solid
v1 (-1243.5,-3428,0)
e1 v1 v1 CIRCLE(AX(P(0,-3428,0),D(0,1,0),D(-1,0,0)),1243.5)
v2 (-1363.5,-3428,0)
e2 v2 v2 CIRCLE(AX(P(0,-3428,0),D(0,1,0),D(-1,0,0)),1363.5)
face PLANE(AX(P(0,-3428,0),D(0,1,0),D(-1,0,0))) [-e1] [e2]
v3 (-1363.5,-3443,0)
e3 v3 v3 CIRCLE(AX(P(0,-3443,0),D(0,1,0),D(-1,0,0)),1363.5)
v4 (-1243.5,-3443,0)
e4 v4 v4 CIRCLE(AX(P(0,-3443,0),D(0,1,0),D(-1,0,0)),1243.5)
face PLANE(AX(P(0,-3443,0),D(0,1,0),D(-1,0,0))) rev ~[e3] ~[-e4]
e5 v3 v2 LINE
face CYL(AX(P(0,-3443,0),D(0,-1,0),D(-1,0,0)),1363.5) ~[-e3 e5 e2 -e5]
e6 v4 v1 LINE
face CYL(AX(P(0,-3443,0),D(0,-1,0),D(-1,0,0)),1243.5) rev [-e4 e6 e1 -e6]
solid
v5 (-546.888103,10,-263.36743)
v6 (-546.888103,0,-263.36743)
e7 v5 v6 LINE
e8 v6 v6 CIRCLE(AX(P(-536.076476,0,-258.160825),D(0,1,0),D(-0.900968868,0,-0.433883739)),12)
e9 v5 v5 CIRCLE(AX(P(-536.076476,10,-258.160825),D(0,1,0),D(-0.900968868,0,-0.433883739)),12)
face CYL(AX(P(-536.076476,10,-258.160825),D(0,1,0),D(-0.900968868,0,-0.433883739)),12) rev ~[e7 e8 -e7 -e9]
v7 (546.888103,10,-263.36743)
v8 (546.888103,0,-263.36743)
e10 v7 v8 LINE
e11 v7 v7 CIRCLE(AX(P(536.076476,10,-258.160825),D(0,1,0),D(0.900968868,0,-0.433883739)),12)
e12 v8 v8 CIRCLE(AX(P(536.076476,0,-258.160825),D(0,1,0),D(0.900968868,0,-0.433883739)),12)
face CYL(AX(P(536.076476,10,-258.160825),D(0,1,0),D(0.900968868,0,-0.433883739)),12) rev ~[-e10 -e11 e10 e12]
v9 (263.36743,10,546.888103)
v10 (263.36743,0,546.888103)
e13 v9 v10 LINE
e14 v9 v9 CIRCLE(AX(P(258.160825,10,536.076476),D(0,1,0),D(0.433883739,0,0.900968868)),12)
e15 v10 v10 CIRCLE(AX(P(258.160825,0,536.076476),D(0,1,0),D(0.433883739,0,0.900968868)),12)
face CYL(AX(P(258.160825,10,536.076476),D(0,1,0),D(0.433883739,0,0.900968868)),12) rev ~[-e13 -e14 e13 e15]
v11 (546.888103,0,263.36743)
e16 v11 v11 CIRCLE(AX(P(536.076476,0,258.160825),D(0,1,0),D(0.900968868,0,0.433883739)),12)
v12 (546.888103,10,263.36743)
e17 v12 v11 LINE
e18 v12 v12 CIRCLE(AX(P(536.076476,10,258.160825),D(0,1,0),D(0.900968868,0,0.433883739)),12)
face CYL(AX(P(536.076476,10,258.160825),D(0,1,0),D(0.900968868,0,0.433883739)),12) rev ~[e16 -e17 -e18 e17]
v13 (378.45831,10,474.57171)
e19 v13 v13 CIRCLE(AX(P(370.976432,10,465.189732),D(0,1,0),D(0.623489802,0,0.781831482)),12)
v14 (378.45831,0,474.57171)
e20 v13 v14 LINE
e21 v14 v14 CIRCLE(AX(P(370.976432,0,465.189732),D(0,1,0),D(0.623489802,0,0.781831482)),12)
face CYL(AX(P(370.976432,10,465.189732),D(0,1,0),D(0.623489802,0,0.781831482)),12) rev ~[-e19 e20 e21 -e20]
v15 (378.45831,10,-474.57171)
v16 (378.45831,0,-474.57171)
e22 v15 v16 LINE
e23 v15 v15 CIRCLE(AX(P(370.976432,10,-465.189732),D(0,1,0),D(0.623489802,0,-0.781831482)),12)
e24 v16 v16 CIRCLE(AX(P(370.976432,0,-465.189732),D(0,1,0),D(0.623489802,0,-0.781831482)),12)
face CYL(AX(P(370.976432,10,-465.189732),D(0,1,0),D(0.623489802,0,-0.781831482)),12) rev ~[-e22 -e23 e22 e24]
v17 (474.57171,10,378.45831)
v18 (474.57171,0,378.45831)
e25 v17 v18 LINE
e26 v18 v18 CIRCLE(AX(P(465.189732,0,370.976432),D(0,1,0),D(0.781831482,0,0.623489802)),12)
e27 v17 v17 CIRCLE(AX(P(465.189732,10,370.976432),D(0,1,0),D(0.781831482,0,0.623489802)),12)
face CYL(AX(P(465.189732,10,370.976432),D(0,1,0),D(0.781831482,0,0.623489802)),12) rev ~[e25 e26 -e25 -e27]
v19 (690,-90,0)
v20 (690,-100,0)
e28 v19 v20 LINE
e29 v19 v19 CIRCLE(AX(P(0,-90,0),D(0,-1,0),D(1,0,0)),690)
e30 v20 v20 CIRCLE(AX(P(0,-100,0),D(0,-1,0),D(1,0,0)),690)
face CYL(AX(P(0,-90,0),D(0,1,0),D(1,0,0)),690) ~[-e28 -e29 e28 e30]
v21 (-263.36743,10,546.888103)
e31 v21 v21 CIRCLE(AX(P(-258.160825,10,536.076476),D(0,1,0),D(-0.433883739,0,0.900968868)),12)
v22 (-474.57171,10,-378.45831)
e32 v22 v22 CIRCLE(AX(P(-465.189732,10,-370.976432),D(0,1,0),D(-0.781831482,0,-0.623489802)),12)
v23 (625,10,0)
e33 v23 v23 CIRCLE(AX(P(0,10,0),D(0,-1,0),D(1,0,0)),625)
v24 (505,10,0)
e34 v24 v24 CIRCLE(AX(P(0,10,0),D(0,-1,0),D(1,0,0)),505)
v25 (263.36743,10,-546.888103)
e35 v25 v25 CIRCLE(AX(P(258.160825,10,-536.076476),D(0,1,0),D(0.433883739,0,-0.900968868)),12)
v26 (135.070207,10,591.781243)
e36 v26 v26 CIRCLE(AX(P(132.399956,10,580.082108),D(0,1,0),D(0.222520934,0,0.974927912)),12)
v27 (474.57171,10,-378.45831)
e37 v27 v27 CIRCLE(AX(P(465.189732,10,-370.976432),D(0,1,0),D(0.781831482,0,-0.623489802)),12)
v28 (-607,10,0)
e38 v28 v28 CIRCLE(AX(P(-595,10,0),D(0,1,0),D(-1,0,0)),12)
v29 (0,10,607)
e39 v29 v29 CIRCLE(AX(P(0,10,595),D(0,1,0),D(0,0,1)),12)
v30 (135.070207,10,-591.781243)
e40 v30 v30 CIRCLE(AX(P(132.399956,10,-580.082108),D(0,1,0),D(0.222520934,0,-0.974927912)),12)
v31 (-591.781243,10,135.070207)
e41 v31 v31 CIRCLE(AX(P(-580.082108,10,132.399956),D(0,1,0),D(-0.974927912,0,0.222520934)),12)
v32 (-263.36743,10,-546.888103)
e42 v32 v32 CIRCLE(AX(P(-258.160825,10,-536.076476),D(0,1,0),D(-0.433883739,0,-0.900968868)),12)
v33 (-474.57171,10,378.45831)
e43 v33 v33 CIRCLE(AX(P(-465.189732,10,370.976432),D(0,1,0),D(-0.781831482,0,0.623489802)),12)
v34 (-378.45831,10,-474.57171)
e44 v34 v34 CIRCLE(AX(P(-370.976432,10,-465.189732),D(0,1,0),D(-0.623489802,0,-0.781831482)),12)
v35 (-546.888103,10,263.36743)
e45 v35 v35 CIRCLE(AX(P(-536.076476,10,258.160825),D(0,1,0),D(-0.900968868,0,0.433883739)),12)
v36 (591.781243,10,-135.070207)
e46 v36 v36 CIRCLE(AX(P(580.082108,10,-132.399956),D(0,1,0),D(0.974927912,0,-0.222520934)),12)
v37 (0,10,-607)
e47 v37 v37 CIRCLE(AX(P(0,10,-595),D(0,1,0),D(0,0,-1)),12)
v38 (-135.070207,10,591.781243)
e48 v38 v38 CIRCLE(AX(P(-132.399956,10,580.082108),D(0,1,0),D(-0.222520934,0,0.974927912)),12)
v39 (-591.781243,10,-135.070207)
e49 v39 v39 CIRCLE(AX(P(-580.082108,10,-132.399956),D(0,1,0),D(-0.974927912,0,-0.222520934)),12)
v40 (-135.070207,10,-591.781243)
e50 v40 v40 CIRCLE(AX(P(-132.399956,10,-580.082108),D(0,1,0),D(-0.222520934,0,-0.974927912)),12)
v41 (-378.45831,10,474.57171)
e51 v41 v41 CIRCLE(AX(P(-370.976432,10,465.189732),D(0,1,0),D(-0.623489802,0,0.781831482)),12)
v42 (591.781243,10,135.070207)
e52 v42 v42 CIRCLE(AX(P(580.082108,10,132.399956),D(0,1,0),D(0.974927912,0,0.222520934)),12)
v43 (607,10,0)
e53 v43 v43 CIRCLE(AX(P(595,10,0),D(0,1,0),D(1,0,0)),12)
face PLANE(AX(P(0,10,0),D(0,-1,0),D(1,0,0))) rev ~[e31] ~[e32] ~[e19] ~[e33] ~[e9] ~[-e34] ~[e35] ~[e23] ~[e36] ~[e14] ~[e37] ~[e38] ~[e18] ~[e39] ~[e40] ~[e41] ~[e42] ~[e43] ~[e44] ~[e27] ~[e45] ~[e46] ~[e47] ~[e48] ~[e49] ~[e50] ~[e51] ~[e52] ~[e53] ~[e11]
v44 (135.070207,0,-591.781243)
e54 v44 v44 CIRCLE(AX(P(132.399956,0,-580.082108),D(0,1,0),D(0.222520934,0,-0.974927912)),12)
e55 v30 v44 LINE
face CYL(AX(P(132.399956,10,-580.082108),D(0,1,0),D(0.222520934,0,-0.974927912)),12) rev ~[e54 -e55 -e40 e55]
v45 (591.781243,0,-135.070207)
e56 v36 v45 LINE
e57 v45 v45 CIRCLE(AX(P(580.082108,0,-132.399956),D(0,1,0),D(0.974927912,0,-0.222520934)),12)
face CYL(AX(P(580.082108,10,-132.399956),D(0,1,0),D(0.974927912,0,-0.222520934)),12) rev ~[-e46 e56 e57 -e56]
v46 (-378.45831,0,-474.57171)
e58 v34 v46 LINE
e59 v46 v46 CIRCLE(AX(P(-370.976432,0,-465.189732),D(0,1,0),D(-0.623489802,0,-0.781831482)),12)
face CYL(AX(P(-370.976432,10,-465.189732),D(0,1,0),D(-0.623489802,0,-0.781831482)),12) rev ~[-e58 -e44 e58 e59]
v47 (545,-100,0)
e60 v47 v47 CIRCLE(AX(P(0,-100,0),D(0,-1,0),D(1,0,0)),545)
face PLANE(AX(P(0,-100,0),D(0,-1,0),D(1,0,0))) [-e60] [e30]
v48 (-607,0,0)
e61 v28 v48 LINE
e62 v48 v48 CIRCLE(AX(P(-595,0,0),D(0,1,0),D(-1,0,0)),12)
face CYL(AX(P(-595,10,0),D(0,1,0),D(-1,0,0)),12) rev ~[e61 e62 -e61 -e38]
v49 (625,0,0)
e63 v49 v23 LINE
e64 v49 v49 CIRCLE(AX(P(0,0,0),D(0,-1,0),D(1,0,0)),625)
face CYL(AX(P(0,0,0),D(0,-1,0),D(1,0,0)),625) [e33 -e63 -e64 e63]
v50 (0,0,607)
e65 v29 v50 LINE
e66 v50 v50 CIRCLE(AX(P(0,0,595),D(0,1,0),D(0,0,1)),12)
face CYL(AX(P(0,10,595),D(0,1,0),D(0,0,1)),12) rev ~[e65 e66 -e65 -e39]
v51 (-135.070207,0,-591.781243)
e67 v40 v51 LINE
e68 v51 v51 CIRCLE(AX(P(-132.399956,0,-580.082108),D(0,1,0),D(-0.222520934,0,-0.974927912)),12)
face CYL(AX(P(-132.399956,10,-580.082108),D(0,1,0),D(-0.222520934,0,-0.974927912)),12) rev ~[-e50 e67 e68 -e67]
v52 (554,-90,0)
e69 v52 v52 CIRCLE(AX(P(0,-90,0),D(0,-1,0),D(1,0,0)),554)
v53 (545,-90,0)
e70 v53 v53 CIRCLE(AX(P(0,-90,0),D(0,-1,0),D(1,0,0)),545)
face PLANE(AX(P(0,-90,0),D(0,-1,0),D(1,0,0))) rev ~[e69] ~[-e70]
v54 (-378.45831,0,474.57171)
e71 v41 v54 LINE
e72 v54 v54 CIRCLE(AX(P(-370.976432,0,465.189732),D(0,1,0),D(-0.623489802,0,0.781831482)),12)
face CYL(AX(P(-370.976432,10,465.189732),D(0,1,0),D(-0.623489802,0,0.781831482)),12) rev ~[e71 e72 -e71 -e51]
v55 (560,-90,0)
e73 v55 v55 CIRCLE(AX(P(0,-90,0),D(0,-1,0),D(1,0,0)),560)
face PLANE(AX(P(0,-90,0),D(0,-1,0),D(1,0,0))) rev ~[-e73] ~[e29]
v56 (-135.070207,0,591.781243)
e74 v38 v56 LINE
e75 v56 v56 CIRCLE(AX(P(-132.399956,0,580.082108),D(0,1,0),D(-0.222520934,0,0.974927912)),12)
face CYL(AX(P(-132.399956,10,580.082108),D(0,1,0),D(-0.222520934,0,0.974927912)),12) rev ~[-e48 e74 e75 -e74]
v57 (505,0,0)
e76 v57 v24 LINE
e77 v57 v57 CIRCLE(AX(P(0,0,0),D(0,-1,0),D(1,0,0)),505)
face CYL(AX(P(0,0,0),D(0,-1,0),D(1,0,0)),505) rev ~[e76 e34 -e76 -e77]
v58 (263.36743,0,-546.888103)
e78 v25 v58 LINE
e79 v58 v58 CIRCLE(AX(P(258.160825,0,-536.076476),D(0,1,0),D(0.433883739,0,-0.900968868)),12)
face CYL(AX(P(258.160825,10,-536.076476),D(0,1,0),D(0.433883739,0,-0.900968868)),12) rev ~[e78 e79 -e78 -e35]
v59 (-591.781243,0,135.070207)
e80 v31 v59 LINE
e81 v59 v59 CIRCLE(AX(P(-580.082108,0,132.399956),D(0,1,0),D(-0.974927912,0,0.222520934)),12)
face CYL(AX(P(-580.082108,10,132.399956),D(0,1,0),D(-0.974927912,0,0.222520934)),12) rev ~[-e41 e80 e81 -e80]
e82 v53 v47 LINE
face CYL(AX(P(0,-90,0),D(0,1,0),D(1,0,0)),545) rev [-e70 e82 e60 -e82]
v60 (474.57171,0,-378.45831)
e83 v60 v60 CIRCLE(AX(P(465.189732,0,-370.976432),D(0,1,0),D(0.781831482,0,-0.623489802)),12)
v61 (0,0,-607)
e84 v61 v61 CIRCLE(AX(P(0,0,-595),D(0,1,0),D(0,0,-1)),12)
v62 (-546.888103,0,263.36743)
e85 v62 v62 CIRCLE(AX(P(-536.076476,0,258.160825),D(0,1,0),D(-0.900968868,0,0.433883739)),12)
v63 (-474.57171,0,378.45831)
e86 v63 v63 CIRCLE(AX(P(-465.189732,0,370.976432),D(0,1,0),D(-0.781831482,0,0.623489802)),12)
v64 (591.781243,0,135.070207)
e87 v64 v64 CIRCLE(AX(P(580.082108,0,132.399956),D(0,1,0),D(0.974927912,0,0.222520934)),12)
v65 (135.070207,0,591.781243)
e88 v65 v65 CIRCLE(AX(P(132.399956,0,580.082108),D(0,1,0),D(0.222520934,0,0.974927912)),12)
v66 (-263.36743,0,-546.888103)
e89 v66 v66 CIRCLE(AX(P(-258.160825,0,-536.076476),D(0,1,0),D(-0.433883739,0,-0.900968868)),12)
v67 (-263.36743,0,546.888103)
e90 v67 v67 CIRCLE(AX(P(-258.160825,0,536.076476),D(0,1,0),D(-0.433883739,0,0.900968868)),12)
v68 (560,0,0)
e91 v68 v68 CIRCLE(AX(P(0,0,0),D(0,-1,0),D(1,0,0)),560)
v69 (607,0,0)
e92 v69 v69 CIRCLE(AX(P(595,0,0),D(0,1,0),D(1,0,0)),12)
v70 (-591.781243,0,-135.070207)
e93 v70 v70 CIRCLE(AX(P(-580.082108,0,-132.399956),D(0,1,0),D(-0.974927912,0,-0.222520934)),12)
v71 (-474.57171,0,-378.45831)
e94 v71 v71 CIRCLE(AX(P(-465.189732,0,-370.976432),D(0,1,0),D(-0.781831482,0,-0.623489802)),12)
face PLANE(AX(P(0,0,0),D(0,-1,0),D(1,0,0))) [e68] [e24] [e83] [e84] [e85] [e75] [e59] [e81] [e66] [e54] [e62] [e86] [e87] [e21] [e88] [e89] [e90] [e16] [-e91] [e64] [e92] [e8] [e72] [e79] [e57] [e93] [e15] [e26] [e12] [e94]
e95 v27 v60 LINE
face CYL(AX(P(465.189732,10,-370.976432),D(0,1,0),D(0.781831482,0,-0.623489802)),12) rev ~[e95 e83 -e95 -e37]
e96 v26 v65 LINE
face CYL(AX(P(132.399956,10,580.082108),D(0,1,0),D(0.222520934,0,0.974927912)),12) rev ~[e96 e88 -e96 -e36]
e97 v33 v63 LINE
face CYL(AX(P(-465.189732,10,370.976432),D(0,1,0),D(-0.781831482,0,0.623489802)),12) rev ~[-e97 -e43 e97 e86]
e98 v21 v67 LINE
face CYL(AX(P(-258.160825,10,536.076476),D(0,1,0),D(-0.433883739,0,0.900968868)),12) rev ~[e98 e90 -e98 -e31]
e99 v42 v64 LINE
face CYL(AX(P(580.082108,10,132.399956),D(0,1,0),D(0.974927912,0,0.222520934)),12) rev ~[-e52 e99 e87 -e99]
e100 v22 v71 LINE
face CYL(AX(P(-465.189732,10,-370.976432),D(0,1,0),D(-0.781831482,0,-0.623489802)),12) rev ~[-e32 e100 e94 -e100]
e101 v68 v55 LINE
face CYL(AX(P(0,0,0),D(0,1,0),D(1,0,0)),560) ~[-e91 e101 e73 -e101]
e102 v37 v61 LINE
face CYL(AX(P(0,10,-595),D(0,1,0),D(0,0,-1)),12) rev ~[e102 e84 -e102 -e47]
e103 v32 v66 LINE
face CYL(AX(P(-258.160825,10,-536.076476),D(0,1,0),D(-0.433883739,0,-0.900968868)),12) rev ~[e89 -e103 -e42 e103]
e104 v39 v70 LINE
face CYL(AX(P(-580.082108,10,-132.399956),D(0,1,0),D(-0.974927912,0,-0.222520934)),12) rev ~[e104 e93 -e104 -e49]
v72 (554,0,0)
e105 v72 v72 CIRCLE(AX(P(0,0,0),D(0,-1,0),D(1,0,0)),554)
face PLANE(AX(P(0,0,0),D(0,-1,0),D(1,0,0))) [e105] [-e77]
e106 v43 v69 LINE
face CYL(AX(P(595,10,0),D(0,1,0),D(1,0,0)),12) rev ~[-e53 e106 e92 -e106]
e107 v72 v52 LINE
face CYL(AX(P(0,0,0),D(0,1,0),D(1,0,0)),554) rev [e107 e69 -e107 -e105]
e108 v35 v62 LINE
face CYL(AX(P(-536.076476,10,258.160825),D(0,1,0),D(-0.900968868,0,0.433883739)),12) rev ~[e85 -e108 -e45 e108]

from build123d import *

# Parameters (mm, degrees)
F0_R             = 625
F0_R_2           = 505
F1_DEPTH         = 10
F2_R             = 560
F2_R_2           = 554
F3_DEPTH         = 90
F4_R             = 690
F4_R_2           = 545
F5_DEPTH         = 10
F7_R             = 1363.5
F7_R_2           = 1243.5
F8_DEPTH         = 15
F14_R            = 12
F15_DEPTH        = 10
F15_COPIES_COUNT = 28


# Not quite as in the source:
# - a pattern or mirror of a feature is missing from the dataset's text; its kind, count and spacing are read off the source's solid
# - the program builds the solid bodies; features that only make, move or delete a surface that nothing else refers to are left out


with BuildPart() as f1:
    # F0 (on Front) → F1 (new body)
    with BuildSketch(Plane.XZ):
        Circle(F0_R)
        Circle(F0_R_2, mode=Mode.SUBTRACT)
    extrude(amount=-F1_DEPTH)

    # F2 (on face) → F3 (join)
    with BuildSketch(Plane.XZ):
        Circle(F2_R)
        Circle(F2_R_2, mode=Mode.SUBTRACT)
    extrude(amount=F3_DEPTH)

    # F4 (on face) → F5 (join)
    with BuildSketch(Plane.XZ.offset(90)):
        Circle(F4_R)
        Circle(F4_R_2, mode=Mode.SUBTRACT)
    extrude(amount=F5_DEPTH)

    # F14 (on face) → F15 (cut, through all)
    with BuildSketch(Plane(origin=(0, 10, 0), x_dir=(-1, 0, 0), z_dir=(0, 1, 0))):
        with Locations((595, 0)):
            Circle(F14_R)
    f15 = extrude(amount=-F15_DEPTH, mode=Mode.SUBTRACT)

    # F15_copies: F15 ×28 about axis
    f15_copies_axis = Axis((0, 0, 0), (0, 1, 0))
    for i in range(1, F15_COPIES_COUNT):
        add(f15.rotate(f15_copies_axis, i * 360 / F15_COPIES_COUNT), mode=Mode.SUBTRACT)


with BuildPart() as f8:
    # F7 (on offset) → F8 (new body)
    with BuildSketch(Plane(origin=(0, -3443, 0), x_dir=(-1, 0, 0), z_dir=(0, 1, 0))):
        Circle(F7_R)
        Circle(F7_R_2, mode=Mode.SUBTRACT)
    extrude(amount=F8_DEPTH)


solid = Compound([f1.part, f8.part])
